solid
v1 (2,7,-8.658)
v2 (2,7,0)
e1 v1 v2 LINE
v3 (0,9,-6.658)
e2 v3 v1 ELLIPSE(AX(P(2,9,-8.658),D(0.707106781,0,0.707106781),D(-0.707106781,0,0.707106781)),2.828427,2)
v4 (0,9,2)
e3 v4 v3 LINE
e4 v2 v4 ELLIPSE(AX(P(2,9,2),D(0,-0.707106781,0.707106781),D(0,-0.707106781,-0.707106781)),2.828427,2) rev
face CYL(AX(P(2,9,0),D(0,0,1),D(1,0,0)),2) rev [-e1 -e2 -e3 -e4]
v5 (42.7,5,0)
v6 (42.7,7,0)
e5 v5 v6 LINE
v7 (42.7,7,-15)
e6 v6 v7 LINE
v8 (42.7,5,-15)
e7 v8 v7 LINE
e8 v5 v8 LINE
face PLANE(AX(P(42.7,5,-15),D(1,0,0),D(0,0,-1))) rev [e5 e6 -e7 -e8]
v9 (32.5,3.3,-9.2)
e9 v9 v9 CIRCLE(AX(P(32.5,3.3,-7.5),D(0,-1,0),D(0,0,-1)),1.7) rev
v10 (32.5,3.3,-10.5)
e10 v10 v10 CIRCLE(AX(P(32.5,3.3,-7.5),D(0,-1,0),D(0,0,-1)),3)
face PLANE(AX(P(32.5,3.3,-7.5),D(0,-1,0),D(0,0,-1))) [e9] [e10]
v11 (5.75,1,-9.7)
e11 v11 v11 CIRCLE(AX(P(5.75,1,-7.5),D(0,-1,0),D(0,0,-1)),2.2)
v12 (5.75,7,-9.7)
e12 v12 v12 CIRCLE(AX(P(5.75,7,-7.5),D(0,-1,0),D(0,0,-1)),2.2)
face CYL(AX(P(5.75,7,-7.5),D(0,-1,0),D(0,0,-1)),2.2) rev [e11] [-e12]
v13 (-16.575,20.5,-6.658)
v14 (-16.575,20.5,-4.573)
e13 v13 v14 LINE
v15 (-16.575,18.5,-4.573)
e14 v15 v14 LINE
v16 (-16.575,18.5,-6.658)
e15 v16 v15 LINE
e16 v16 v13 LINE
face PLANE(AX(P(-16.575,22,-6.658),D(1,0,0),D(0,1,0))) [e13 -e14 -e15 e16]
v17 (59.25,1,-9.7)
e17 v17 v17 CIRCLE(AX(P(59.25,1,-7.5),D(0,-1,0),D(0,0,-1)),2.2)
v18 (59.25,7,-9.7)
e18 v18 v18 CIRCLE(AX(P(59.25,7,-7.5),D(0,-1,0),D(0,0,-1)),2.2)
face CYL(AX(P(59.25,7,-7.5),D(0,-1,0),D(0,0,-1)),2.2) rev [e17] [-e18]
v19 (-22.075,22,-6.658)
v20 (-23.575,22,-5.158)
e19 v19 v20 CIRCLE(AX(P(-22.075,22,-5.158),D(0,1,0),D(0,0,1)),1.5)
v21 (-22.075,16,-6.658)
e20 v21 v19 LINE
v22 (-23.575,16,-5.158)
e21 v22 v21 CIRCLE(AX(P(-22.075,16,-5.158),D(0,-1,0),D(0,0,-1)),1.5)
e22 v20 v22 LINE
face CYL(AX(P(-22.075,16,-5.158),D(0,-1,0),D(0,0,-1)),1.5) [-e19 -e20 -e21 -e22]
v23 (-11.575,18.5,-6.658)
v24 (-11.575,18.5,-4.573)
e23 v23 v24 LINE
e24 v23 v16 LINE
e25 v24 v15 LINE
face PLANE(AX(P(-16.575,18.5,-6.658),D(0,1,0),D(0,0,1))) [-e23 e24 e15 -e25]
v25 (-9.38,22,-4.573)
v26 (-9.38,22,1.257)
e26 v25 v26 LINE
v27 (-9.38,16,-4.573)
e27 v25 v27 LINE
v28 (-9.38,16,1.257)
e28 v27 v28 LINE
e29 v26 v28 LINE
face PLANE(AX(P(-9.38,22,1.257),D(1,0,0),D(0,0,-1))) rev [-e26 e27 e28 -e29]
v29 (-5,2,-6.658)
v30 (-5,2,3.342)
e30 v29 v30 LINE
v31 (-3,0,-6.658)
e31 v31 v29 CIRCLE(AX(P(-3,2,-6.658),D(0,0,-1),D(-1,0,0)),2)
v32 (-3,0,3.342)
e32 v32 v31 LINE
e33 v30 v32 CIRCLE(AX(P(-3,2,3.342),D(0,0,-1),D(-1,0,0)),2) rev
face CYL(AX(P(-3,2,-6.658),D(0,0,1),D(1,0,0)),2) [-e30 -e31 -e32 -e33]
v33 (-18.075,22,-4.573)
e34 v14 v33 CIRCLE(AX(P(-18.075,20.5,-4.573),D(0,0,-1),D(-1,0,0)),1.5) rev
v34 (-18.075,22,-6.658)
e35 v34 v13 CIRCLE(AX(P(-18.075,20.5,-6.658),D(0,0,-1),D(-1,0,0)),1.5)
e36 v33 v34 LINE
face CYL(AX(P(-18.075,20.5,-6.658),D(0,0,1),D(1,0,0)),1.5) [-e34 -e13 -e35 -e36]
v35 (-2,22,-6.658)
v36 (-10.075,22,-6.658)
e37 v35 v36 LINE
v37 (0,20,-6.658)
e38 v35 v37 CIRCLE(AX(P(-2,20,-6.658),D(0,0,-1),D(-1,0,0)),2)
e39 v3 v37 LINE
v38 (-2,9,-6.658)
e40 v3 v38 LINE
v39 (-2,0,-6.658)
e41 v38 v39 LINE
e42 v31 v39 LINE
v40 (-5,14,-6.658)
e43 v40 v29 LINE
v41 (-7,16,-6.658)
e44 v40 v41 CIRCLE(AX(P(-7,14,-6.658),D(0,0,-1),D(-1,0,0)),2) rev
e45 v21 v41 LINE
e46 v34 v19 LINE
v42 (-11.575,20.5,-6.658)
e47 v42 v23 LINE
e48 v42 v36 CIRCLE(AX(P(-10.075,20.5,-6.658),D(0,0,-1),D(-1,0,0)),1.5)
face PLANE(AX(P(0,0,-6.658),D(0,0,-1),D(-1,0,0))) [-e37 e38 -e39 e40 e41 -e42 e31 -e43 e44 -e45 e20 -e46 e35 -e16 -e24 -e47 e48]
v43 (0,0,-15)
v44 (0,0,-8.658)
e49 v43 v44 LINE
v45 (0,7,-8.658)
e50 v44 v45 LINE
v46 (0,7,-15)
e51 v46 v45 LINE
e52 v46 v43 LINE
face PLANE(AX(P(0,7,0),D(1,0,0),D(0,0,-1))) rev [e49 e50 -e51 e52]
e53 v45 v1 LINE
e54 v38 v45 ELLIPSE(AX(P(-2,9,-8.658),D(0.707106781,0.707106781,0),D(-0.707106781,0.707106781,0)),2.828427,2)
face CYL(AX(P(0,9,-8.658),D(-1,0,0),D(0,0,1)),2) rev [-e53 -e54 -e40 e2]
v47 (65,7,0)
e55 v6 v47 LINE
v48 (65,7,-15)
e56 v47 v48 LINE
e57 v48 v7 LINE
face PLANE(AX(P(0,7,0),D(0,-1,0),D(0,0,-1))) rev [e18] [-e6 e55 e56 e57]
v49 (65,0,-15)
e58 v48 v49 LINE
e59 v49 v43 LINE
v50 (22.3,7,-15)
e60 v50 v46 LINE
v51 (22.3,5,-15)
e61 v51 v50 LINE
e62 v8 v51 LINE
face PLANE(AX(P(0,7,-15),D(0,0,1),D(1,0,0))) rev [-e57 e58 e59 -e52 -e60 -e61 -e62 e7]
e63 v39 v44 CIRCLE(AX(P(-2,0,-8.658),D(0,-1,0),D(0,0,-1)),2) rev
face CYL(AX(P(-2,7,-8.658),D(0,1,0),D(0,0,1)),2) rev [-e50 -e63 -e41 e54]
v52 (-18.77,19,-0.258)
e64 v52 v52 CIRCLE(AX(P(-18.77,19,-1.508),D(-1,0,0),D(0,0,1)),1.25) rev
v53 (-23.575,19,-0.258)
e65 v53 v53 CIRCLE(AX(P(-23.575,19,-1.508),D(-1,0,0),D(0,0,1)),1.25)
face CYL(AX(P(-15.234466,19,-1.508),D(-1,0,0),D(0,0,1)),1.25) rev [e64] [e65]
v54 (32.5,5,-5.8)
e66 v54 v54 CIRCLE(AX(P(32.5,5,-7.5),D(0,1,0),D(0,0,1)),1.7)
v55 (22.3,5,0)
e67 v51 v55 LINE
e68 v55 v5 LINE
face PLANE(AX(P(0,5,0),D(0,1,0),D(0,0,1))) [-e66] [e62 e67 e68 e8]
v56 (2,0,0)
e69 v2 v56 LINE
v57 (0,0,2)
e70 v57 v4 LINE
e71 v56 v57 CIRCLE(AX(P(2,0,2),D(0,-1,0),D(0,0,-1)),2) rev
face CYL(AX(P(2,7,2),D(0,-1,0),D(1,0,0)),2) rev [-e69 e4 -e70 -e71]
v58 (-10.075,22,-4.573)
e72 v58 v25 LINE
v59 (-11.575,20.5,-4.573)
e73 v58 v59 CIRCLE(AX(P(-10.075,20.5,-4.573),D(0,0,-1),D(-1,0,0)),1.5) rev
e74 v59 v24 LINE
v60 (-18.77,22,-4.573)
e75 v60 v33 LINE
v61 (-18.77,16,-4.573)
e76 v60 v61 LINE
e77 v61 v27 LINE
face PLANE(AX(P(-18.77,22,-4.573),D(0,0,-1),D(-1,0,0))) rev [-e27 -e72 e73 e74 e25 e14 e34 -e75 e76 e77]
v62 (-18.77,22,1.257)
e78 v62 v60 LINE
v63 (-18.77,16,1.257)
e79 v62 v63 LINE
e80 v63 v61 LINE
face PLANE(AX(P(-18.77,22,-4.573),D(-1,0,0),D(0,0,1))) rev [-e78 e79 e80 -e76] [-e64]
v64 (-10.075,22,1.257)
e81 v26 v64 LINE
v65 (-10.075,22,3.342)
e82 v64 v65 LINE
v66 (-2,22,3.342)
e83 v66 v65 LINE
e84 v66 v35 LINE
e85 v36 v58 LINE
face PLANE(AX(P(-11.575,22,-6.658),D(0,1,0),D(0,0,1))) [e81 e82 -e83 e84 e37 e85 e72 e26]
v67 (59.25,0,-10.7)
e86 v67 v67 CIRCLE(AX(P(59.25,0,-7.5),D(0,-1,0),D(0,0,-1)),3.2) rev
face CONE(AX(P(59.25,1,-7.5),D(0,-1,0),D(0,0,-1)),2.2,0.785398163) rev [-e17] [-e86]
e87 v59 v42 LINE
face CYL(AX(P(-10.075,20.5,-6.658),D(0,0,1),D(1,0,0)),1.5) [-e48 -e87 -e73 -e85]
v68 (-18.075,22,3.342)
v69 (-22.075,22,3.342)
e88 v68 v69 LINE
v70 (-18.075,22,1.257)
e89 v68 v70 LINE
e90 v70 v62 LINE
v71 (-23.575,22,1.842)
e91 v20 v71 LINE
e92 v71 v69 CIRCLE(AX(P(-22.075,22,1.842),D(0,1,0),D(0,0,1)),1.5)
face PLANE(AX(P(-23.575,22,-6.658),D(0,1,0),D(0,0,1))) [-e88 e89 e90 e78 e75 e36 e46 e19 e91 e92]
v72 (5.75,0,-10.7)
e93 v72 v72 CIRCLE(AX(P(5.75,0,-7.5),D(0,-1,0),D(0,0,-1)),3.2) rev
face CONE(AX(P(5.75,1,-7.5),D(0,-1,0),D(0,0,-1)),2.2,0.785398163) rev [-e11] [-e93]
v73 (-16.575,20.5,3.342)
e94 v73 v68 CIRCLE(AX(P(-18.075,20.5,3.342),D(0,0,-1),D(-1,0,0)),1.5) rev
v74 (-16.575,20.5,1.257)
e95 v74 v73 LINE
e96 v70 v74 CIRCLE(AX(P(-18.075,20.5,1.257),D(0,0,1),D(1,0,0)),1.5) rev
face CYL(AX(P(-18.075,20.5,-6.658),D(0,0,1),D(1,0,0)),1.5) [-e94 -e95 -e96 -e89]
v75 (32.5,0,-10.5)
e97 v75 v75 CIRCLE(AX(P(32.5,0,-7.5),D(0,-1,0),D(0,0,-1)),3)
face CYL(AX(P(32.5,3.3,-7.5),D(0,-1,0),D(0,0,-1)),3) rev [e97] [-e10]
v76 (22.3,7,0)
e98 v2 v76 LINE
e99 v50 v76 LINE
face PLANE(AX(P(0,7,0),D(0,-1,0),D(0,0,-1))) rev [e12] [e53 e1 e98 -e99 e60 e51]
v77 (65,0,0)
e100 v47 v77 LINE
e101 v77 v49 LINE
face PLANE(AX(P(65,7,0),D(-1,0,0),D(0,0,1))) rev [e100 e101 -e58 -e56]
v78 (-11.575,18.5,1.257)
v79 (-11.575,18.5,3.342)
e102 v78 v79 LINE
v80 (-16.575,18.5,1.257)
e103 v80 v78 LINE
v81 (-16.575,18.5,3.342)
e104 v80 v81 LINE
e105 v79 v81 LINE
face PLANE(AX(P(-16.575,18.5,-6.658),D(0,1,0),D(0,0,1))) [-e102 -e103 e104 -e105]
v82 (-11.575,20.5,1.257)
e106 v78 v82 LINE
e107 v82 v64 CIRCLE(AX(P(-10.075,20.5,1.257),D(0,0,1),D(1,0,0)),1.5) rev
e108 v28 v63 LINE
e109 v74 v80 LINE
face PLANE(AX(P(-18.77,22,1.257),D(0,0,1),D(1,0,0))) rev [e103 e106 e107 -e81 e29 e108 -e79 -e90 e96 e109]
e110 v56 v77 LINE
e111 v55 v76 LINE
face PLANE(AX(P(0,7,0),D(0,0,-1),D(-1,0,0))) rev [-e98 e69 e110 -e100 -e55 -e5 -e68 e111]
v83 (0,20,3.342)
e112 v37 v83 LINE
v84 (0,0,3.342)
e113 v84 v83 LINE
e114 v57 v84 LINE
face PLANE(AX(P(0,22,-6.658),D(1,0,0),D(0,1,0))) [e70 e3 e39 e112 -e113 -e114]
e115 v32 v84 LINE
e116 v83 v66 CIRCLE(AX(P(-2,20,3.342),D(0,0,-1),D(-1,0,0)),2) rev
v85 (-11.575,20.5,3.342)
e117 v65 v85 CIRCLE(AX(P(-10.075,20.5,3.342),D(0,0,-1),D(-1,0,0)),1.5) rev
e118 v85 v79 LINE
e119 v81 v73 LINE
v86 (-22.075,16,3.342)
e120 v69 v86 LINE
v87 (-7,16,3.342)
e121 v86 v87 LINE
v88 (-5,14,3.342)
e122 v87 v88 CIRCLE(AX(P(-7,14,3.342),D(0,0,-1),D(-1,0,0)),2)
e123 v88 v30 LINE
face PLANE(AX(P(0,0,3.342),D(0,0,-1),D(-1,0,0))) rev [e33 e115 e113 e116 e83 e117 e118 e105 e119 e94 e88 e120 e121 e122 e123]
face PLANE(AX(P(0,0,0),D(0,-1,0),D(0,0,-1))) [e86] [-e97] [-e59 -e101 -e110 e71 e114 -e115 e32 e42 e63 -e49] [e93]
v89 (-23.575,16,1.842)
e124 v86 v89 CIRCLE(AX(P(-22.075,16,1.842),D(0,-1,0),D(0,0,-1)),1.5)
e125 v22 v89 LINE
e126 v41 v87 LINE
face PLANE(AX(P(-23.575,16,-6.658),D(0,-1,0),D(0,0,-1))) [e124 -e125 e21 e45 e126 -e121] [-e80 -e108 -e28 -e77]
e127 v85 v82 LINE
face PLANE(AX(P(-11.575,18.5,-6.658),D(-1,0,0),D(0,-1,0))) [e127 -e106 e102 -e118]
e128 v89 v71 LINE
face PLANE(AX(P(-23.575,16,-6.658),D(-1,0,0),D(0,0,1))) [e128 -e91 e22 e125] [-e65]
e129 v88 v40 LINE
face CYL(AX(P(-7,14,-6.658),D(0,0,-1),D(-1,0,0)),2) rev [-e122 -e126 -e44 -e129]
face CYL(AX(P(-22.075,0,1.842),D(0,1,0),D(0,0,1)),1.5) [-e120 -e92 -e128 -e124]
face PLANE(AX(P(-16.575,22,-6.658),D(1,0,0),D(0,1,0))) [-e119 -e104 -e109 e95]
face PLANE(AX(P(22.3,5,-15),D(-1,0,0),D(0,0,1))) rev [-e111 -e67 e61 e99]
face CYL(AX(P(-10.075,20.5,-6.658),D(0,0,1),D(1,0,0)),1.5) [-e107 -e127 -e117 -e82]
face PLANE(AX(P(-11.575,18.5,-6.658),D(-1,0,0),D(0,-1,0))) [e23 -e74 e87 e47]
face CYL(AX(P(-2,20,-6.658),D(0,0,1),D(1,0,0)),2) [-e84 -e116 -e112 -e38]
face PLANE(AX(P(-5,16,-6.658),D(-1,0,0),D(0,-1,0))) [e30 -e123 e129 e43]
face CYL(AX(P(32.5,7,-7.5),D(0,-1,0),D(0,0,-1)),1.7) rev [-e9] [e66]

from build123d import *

# Parameters (mm, degrees)
SKETCH1_W                = 65
SKETCH1_H                = 15
BOSS_EXTRUDE1_DEPTH      = 7
SKETCH2_W                = 20.4
SKETCH2_H                = 15
CUT_EXTRUDE1_DEPTH       = 2
SKETCH3_R                = 1.7
CUT_EXTRUDE2_DEPTH       = 68.074585351
SKETCH4_R                = 3
CUT_EXTRUDE3_DEPTH       = 3.3
SKETCH5_R                = 2.2
CUT_EXTRUDE4_DEPTH       = 68.074585351
CHAMFER1_SIZE            = 1
BOSS_EXTRUDE2_DEPTH      = 5
BOSS_EXTRUDE2_DEPTH_BACK = 5
CUT_EXTRUDE5_DEPTH       = 69.600291545
CUT_EXTRUDE5_DEPTH_BACK  = 69.600291545
SKETCH7_W                = 9.39
SKETCH7_H                = 5.83
FILLET1_R                = 1.5
FILLET2_R                = 2
FILLET3_R                = 2
FILLET4_R                = 2
SKETCH8_R                = 1.25
CUT_EXTRUDE6_DEPTH       = 4.805
FILLET5_R                = 2


with BuildPart() as part:
    # Sketch1 → Boss-Extrude1 (new body)
    with BuildSketch(Plane(origin=(0, 0, 0), x_dir=(1, 0, 0), z_dir=(0, 1, 0))):
        with Locations((32.5, 7.5)):
            Rectangle(SKETCH1_W, SKETCH1_H)
    extrude(amount=BOSS_EXTRUDE1_DEPTH)

    # Sketch2 → Cut-Extrude1 (cut)
    with BuildSketch(Plane(origin=(0, 7, 0), x_dir=(1, 0, 0), z_dir=(0, 1, 0))):
        with Locations((32.5, 7.5)):
            Rectangle(SKETCH2_W, SKETCH2_H)
    extrude(amount=-CUT_EXTRUDE1_DEPTH, mode=Mode.SUBTRACT)

    # Sketch3 → Cut-Extrude2 (cut, through all)
    with BuildSketch(Plane(origin=(0, 0, 0), x_dir=(-1, 0, 0), z_dir=(0, -1, 0))):
        with Locations(Location((-32.5, 7.5, 0), (0, 0, 90))):
            Circle(SKETCH3_R)
    extrude(amount=-CUT_EXTRUDE2_DEPTH, mode=Mode.SUBTRACT)

    # Sketch4 → Cut-Extrude3 (cut)
    with BuildSketch(Plane(origin=(0, 0, 0), x_dir=(-1, 0, 0), z_dir=(0, -1, 0))):
        with Locations(Location((-32.5, 7.5, 0), (0, 0, 90))):
            Circle(SKETCH4_R)
    extrude(amount=-CUT_EXTRUDE3_DEPTH, mode=Mode.SUBTRACT)

    # Sketch5 → Cut-Extrude4 (cut, through all)
    with BuildSketch(Plane(origin=(0, 0, 0), x_dir=(-1, 0, 0), z_dir=(0, -1, 0))):
        with Locations(Location((-5.75, 7.5, 0), (0, 0, 90))):
            Circle(SKETCH5_R)
        with Locations(Location((-59.25, 7.5, 0), (0, 0, 90))):
            Circle(SKETCH5_R)
    extrude(amount=-CUT_EXTRUDE4_DEPTH, mode=Mode.SUBTRACT)

    # Chamfer1
    chamfer1_edges = [part.edges().sort_by_distance(p)[0] for p in [
        (5.75, 0, -5.3),
        (59.25, 0, -5.3),
    ]]
    chamfer(chamfer1_edges, length=CHAMFER1_SIZE)

    # Sketch6 → Boss-Extrude2 (add, two sides: drawn at the far end of the back side and taken through both)
    with BuildSketch(Plane.XY.offset(-1.658).offset(-BOSS_EXTRUDE2_DEPTH_BACK)):
        Polygon((-16.575, 22), (-16.575, 18.5), (-11.575, 18.5), (-11.575, 22), (0, 22), (0, 7), (0, 0), (-5, 0), (-5, 16), (-23.575, 16), (-23.575, 22), align=None)
    extrude(amount=BOSS_EXTRUDE2_DEPTH + BOSS_EXTRUDE2_DEPTH_BACK)

    # Sketch7 → Cut-Extrude5 (cut, two sides: drawn at the far end of the back side and taken through both)
    with BuildSketch(Plane.XZ.offset(-16).offset(-CUT_EXTRUDE5_DEPTH_BACK)):
        with Locations((-14.075, -1.658)):
            Rectangle(SKETCH7_W, SKETCH7_H)
    extrude(amount=CUT_EXTRUDE5_DEPTH + CUT_EXTRUDE5_DEPTH_BACK, mode=Mode.SUBTRACT)

    # Fillet1
    fillet1_edges = [part.edges().sort_by_distance(p)[0] for p in [
        (-16.575, 22, -5.6155),
        (-11.575, 22, -5.6155),
        (-23.575, 19, -6.658),
        (-23.575, 19, 3.342),
        (-11.575, 22, 2.2995),
        (-16.575, 22, 2.2995),
    ]]
    fillet(fillet1_edges, radius=FILLET1_R)

    # Fillet2
    fillet2_edges = [part.edges().sort_by_distance(p)[0] for p in [
        (-5, 0, -1.658),
        (-5, 16, -1.658),
    ]]
    fillet(fillet2_edges, radius=FILLET2_R)

    # Fillet3
    fillet3_edges = [part.edges().sort_by_distance(p)[0] for p in [
        (0, 22, -1.658),
    ]]
    fillet(fillet3_edges, radius=FILLET3_R)

    # Fillet4
    fillet4_edges = [part.edges().sort_by_distance(p)[0] for p in [
        (0, 3.5, -6.658),
        (0, 3.5, 0),
    ]]
    fillet(fillet4_edges, radius=FILLET4_R)

    # Sketch8 → Cut-Extrude6 (cut)
    with BuildSketch(Plane.ZY.offset(23.575)):
        with Locations((-1.508, 19)):
            Circle(SKETCH8_R)
    extrude(amount=-CUT_EXTRUDE6_DEPTH, mode=Mode.SUBTRACT)

    # Fillet5
    fillet5_edges = [part.edges().sort_by_distance(p)[0] for p in [
        (-1, 7, -6.658),
        (0, 7, -2.329),
    ]]
    fillet(fillet5_edges, radius=FILLET5_R - 0.0001)  # a hair under: the kernel refuses the full size


solid = part.part
